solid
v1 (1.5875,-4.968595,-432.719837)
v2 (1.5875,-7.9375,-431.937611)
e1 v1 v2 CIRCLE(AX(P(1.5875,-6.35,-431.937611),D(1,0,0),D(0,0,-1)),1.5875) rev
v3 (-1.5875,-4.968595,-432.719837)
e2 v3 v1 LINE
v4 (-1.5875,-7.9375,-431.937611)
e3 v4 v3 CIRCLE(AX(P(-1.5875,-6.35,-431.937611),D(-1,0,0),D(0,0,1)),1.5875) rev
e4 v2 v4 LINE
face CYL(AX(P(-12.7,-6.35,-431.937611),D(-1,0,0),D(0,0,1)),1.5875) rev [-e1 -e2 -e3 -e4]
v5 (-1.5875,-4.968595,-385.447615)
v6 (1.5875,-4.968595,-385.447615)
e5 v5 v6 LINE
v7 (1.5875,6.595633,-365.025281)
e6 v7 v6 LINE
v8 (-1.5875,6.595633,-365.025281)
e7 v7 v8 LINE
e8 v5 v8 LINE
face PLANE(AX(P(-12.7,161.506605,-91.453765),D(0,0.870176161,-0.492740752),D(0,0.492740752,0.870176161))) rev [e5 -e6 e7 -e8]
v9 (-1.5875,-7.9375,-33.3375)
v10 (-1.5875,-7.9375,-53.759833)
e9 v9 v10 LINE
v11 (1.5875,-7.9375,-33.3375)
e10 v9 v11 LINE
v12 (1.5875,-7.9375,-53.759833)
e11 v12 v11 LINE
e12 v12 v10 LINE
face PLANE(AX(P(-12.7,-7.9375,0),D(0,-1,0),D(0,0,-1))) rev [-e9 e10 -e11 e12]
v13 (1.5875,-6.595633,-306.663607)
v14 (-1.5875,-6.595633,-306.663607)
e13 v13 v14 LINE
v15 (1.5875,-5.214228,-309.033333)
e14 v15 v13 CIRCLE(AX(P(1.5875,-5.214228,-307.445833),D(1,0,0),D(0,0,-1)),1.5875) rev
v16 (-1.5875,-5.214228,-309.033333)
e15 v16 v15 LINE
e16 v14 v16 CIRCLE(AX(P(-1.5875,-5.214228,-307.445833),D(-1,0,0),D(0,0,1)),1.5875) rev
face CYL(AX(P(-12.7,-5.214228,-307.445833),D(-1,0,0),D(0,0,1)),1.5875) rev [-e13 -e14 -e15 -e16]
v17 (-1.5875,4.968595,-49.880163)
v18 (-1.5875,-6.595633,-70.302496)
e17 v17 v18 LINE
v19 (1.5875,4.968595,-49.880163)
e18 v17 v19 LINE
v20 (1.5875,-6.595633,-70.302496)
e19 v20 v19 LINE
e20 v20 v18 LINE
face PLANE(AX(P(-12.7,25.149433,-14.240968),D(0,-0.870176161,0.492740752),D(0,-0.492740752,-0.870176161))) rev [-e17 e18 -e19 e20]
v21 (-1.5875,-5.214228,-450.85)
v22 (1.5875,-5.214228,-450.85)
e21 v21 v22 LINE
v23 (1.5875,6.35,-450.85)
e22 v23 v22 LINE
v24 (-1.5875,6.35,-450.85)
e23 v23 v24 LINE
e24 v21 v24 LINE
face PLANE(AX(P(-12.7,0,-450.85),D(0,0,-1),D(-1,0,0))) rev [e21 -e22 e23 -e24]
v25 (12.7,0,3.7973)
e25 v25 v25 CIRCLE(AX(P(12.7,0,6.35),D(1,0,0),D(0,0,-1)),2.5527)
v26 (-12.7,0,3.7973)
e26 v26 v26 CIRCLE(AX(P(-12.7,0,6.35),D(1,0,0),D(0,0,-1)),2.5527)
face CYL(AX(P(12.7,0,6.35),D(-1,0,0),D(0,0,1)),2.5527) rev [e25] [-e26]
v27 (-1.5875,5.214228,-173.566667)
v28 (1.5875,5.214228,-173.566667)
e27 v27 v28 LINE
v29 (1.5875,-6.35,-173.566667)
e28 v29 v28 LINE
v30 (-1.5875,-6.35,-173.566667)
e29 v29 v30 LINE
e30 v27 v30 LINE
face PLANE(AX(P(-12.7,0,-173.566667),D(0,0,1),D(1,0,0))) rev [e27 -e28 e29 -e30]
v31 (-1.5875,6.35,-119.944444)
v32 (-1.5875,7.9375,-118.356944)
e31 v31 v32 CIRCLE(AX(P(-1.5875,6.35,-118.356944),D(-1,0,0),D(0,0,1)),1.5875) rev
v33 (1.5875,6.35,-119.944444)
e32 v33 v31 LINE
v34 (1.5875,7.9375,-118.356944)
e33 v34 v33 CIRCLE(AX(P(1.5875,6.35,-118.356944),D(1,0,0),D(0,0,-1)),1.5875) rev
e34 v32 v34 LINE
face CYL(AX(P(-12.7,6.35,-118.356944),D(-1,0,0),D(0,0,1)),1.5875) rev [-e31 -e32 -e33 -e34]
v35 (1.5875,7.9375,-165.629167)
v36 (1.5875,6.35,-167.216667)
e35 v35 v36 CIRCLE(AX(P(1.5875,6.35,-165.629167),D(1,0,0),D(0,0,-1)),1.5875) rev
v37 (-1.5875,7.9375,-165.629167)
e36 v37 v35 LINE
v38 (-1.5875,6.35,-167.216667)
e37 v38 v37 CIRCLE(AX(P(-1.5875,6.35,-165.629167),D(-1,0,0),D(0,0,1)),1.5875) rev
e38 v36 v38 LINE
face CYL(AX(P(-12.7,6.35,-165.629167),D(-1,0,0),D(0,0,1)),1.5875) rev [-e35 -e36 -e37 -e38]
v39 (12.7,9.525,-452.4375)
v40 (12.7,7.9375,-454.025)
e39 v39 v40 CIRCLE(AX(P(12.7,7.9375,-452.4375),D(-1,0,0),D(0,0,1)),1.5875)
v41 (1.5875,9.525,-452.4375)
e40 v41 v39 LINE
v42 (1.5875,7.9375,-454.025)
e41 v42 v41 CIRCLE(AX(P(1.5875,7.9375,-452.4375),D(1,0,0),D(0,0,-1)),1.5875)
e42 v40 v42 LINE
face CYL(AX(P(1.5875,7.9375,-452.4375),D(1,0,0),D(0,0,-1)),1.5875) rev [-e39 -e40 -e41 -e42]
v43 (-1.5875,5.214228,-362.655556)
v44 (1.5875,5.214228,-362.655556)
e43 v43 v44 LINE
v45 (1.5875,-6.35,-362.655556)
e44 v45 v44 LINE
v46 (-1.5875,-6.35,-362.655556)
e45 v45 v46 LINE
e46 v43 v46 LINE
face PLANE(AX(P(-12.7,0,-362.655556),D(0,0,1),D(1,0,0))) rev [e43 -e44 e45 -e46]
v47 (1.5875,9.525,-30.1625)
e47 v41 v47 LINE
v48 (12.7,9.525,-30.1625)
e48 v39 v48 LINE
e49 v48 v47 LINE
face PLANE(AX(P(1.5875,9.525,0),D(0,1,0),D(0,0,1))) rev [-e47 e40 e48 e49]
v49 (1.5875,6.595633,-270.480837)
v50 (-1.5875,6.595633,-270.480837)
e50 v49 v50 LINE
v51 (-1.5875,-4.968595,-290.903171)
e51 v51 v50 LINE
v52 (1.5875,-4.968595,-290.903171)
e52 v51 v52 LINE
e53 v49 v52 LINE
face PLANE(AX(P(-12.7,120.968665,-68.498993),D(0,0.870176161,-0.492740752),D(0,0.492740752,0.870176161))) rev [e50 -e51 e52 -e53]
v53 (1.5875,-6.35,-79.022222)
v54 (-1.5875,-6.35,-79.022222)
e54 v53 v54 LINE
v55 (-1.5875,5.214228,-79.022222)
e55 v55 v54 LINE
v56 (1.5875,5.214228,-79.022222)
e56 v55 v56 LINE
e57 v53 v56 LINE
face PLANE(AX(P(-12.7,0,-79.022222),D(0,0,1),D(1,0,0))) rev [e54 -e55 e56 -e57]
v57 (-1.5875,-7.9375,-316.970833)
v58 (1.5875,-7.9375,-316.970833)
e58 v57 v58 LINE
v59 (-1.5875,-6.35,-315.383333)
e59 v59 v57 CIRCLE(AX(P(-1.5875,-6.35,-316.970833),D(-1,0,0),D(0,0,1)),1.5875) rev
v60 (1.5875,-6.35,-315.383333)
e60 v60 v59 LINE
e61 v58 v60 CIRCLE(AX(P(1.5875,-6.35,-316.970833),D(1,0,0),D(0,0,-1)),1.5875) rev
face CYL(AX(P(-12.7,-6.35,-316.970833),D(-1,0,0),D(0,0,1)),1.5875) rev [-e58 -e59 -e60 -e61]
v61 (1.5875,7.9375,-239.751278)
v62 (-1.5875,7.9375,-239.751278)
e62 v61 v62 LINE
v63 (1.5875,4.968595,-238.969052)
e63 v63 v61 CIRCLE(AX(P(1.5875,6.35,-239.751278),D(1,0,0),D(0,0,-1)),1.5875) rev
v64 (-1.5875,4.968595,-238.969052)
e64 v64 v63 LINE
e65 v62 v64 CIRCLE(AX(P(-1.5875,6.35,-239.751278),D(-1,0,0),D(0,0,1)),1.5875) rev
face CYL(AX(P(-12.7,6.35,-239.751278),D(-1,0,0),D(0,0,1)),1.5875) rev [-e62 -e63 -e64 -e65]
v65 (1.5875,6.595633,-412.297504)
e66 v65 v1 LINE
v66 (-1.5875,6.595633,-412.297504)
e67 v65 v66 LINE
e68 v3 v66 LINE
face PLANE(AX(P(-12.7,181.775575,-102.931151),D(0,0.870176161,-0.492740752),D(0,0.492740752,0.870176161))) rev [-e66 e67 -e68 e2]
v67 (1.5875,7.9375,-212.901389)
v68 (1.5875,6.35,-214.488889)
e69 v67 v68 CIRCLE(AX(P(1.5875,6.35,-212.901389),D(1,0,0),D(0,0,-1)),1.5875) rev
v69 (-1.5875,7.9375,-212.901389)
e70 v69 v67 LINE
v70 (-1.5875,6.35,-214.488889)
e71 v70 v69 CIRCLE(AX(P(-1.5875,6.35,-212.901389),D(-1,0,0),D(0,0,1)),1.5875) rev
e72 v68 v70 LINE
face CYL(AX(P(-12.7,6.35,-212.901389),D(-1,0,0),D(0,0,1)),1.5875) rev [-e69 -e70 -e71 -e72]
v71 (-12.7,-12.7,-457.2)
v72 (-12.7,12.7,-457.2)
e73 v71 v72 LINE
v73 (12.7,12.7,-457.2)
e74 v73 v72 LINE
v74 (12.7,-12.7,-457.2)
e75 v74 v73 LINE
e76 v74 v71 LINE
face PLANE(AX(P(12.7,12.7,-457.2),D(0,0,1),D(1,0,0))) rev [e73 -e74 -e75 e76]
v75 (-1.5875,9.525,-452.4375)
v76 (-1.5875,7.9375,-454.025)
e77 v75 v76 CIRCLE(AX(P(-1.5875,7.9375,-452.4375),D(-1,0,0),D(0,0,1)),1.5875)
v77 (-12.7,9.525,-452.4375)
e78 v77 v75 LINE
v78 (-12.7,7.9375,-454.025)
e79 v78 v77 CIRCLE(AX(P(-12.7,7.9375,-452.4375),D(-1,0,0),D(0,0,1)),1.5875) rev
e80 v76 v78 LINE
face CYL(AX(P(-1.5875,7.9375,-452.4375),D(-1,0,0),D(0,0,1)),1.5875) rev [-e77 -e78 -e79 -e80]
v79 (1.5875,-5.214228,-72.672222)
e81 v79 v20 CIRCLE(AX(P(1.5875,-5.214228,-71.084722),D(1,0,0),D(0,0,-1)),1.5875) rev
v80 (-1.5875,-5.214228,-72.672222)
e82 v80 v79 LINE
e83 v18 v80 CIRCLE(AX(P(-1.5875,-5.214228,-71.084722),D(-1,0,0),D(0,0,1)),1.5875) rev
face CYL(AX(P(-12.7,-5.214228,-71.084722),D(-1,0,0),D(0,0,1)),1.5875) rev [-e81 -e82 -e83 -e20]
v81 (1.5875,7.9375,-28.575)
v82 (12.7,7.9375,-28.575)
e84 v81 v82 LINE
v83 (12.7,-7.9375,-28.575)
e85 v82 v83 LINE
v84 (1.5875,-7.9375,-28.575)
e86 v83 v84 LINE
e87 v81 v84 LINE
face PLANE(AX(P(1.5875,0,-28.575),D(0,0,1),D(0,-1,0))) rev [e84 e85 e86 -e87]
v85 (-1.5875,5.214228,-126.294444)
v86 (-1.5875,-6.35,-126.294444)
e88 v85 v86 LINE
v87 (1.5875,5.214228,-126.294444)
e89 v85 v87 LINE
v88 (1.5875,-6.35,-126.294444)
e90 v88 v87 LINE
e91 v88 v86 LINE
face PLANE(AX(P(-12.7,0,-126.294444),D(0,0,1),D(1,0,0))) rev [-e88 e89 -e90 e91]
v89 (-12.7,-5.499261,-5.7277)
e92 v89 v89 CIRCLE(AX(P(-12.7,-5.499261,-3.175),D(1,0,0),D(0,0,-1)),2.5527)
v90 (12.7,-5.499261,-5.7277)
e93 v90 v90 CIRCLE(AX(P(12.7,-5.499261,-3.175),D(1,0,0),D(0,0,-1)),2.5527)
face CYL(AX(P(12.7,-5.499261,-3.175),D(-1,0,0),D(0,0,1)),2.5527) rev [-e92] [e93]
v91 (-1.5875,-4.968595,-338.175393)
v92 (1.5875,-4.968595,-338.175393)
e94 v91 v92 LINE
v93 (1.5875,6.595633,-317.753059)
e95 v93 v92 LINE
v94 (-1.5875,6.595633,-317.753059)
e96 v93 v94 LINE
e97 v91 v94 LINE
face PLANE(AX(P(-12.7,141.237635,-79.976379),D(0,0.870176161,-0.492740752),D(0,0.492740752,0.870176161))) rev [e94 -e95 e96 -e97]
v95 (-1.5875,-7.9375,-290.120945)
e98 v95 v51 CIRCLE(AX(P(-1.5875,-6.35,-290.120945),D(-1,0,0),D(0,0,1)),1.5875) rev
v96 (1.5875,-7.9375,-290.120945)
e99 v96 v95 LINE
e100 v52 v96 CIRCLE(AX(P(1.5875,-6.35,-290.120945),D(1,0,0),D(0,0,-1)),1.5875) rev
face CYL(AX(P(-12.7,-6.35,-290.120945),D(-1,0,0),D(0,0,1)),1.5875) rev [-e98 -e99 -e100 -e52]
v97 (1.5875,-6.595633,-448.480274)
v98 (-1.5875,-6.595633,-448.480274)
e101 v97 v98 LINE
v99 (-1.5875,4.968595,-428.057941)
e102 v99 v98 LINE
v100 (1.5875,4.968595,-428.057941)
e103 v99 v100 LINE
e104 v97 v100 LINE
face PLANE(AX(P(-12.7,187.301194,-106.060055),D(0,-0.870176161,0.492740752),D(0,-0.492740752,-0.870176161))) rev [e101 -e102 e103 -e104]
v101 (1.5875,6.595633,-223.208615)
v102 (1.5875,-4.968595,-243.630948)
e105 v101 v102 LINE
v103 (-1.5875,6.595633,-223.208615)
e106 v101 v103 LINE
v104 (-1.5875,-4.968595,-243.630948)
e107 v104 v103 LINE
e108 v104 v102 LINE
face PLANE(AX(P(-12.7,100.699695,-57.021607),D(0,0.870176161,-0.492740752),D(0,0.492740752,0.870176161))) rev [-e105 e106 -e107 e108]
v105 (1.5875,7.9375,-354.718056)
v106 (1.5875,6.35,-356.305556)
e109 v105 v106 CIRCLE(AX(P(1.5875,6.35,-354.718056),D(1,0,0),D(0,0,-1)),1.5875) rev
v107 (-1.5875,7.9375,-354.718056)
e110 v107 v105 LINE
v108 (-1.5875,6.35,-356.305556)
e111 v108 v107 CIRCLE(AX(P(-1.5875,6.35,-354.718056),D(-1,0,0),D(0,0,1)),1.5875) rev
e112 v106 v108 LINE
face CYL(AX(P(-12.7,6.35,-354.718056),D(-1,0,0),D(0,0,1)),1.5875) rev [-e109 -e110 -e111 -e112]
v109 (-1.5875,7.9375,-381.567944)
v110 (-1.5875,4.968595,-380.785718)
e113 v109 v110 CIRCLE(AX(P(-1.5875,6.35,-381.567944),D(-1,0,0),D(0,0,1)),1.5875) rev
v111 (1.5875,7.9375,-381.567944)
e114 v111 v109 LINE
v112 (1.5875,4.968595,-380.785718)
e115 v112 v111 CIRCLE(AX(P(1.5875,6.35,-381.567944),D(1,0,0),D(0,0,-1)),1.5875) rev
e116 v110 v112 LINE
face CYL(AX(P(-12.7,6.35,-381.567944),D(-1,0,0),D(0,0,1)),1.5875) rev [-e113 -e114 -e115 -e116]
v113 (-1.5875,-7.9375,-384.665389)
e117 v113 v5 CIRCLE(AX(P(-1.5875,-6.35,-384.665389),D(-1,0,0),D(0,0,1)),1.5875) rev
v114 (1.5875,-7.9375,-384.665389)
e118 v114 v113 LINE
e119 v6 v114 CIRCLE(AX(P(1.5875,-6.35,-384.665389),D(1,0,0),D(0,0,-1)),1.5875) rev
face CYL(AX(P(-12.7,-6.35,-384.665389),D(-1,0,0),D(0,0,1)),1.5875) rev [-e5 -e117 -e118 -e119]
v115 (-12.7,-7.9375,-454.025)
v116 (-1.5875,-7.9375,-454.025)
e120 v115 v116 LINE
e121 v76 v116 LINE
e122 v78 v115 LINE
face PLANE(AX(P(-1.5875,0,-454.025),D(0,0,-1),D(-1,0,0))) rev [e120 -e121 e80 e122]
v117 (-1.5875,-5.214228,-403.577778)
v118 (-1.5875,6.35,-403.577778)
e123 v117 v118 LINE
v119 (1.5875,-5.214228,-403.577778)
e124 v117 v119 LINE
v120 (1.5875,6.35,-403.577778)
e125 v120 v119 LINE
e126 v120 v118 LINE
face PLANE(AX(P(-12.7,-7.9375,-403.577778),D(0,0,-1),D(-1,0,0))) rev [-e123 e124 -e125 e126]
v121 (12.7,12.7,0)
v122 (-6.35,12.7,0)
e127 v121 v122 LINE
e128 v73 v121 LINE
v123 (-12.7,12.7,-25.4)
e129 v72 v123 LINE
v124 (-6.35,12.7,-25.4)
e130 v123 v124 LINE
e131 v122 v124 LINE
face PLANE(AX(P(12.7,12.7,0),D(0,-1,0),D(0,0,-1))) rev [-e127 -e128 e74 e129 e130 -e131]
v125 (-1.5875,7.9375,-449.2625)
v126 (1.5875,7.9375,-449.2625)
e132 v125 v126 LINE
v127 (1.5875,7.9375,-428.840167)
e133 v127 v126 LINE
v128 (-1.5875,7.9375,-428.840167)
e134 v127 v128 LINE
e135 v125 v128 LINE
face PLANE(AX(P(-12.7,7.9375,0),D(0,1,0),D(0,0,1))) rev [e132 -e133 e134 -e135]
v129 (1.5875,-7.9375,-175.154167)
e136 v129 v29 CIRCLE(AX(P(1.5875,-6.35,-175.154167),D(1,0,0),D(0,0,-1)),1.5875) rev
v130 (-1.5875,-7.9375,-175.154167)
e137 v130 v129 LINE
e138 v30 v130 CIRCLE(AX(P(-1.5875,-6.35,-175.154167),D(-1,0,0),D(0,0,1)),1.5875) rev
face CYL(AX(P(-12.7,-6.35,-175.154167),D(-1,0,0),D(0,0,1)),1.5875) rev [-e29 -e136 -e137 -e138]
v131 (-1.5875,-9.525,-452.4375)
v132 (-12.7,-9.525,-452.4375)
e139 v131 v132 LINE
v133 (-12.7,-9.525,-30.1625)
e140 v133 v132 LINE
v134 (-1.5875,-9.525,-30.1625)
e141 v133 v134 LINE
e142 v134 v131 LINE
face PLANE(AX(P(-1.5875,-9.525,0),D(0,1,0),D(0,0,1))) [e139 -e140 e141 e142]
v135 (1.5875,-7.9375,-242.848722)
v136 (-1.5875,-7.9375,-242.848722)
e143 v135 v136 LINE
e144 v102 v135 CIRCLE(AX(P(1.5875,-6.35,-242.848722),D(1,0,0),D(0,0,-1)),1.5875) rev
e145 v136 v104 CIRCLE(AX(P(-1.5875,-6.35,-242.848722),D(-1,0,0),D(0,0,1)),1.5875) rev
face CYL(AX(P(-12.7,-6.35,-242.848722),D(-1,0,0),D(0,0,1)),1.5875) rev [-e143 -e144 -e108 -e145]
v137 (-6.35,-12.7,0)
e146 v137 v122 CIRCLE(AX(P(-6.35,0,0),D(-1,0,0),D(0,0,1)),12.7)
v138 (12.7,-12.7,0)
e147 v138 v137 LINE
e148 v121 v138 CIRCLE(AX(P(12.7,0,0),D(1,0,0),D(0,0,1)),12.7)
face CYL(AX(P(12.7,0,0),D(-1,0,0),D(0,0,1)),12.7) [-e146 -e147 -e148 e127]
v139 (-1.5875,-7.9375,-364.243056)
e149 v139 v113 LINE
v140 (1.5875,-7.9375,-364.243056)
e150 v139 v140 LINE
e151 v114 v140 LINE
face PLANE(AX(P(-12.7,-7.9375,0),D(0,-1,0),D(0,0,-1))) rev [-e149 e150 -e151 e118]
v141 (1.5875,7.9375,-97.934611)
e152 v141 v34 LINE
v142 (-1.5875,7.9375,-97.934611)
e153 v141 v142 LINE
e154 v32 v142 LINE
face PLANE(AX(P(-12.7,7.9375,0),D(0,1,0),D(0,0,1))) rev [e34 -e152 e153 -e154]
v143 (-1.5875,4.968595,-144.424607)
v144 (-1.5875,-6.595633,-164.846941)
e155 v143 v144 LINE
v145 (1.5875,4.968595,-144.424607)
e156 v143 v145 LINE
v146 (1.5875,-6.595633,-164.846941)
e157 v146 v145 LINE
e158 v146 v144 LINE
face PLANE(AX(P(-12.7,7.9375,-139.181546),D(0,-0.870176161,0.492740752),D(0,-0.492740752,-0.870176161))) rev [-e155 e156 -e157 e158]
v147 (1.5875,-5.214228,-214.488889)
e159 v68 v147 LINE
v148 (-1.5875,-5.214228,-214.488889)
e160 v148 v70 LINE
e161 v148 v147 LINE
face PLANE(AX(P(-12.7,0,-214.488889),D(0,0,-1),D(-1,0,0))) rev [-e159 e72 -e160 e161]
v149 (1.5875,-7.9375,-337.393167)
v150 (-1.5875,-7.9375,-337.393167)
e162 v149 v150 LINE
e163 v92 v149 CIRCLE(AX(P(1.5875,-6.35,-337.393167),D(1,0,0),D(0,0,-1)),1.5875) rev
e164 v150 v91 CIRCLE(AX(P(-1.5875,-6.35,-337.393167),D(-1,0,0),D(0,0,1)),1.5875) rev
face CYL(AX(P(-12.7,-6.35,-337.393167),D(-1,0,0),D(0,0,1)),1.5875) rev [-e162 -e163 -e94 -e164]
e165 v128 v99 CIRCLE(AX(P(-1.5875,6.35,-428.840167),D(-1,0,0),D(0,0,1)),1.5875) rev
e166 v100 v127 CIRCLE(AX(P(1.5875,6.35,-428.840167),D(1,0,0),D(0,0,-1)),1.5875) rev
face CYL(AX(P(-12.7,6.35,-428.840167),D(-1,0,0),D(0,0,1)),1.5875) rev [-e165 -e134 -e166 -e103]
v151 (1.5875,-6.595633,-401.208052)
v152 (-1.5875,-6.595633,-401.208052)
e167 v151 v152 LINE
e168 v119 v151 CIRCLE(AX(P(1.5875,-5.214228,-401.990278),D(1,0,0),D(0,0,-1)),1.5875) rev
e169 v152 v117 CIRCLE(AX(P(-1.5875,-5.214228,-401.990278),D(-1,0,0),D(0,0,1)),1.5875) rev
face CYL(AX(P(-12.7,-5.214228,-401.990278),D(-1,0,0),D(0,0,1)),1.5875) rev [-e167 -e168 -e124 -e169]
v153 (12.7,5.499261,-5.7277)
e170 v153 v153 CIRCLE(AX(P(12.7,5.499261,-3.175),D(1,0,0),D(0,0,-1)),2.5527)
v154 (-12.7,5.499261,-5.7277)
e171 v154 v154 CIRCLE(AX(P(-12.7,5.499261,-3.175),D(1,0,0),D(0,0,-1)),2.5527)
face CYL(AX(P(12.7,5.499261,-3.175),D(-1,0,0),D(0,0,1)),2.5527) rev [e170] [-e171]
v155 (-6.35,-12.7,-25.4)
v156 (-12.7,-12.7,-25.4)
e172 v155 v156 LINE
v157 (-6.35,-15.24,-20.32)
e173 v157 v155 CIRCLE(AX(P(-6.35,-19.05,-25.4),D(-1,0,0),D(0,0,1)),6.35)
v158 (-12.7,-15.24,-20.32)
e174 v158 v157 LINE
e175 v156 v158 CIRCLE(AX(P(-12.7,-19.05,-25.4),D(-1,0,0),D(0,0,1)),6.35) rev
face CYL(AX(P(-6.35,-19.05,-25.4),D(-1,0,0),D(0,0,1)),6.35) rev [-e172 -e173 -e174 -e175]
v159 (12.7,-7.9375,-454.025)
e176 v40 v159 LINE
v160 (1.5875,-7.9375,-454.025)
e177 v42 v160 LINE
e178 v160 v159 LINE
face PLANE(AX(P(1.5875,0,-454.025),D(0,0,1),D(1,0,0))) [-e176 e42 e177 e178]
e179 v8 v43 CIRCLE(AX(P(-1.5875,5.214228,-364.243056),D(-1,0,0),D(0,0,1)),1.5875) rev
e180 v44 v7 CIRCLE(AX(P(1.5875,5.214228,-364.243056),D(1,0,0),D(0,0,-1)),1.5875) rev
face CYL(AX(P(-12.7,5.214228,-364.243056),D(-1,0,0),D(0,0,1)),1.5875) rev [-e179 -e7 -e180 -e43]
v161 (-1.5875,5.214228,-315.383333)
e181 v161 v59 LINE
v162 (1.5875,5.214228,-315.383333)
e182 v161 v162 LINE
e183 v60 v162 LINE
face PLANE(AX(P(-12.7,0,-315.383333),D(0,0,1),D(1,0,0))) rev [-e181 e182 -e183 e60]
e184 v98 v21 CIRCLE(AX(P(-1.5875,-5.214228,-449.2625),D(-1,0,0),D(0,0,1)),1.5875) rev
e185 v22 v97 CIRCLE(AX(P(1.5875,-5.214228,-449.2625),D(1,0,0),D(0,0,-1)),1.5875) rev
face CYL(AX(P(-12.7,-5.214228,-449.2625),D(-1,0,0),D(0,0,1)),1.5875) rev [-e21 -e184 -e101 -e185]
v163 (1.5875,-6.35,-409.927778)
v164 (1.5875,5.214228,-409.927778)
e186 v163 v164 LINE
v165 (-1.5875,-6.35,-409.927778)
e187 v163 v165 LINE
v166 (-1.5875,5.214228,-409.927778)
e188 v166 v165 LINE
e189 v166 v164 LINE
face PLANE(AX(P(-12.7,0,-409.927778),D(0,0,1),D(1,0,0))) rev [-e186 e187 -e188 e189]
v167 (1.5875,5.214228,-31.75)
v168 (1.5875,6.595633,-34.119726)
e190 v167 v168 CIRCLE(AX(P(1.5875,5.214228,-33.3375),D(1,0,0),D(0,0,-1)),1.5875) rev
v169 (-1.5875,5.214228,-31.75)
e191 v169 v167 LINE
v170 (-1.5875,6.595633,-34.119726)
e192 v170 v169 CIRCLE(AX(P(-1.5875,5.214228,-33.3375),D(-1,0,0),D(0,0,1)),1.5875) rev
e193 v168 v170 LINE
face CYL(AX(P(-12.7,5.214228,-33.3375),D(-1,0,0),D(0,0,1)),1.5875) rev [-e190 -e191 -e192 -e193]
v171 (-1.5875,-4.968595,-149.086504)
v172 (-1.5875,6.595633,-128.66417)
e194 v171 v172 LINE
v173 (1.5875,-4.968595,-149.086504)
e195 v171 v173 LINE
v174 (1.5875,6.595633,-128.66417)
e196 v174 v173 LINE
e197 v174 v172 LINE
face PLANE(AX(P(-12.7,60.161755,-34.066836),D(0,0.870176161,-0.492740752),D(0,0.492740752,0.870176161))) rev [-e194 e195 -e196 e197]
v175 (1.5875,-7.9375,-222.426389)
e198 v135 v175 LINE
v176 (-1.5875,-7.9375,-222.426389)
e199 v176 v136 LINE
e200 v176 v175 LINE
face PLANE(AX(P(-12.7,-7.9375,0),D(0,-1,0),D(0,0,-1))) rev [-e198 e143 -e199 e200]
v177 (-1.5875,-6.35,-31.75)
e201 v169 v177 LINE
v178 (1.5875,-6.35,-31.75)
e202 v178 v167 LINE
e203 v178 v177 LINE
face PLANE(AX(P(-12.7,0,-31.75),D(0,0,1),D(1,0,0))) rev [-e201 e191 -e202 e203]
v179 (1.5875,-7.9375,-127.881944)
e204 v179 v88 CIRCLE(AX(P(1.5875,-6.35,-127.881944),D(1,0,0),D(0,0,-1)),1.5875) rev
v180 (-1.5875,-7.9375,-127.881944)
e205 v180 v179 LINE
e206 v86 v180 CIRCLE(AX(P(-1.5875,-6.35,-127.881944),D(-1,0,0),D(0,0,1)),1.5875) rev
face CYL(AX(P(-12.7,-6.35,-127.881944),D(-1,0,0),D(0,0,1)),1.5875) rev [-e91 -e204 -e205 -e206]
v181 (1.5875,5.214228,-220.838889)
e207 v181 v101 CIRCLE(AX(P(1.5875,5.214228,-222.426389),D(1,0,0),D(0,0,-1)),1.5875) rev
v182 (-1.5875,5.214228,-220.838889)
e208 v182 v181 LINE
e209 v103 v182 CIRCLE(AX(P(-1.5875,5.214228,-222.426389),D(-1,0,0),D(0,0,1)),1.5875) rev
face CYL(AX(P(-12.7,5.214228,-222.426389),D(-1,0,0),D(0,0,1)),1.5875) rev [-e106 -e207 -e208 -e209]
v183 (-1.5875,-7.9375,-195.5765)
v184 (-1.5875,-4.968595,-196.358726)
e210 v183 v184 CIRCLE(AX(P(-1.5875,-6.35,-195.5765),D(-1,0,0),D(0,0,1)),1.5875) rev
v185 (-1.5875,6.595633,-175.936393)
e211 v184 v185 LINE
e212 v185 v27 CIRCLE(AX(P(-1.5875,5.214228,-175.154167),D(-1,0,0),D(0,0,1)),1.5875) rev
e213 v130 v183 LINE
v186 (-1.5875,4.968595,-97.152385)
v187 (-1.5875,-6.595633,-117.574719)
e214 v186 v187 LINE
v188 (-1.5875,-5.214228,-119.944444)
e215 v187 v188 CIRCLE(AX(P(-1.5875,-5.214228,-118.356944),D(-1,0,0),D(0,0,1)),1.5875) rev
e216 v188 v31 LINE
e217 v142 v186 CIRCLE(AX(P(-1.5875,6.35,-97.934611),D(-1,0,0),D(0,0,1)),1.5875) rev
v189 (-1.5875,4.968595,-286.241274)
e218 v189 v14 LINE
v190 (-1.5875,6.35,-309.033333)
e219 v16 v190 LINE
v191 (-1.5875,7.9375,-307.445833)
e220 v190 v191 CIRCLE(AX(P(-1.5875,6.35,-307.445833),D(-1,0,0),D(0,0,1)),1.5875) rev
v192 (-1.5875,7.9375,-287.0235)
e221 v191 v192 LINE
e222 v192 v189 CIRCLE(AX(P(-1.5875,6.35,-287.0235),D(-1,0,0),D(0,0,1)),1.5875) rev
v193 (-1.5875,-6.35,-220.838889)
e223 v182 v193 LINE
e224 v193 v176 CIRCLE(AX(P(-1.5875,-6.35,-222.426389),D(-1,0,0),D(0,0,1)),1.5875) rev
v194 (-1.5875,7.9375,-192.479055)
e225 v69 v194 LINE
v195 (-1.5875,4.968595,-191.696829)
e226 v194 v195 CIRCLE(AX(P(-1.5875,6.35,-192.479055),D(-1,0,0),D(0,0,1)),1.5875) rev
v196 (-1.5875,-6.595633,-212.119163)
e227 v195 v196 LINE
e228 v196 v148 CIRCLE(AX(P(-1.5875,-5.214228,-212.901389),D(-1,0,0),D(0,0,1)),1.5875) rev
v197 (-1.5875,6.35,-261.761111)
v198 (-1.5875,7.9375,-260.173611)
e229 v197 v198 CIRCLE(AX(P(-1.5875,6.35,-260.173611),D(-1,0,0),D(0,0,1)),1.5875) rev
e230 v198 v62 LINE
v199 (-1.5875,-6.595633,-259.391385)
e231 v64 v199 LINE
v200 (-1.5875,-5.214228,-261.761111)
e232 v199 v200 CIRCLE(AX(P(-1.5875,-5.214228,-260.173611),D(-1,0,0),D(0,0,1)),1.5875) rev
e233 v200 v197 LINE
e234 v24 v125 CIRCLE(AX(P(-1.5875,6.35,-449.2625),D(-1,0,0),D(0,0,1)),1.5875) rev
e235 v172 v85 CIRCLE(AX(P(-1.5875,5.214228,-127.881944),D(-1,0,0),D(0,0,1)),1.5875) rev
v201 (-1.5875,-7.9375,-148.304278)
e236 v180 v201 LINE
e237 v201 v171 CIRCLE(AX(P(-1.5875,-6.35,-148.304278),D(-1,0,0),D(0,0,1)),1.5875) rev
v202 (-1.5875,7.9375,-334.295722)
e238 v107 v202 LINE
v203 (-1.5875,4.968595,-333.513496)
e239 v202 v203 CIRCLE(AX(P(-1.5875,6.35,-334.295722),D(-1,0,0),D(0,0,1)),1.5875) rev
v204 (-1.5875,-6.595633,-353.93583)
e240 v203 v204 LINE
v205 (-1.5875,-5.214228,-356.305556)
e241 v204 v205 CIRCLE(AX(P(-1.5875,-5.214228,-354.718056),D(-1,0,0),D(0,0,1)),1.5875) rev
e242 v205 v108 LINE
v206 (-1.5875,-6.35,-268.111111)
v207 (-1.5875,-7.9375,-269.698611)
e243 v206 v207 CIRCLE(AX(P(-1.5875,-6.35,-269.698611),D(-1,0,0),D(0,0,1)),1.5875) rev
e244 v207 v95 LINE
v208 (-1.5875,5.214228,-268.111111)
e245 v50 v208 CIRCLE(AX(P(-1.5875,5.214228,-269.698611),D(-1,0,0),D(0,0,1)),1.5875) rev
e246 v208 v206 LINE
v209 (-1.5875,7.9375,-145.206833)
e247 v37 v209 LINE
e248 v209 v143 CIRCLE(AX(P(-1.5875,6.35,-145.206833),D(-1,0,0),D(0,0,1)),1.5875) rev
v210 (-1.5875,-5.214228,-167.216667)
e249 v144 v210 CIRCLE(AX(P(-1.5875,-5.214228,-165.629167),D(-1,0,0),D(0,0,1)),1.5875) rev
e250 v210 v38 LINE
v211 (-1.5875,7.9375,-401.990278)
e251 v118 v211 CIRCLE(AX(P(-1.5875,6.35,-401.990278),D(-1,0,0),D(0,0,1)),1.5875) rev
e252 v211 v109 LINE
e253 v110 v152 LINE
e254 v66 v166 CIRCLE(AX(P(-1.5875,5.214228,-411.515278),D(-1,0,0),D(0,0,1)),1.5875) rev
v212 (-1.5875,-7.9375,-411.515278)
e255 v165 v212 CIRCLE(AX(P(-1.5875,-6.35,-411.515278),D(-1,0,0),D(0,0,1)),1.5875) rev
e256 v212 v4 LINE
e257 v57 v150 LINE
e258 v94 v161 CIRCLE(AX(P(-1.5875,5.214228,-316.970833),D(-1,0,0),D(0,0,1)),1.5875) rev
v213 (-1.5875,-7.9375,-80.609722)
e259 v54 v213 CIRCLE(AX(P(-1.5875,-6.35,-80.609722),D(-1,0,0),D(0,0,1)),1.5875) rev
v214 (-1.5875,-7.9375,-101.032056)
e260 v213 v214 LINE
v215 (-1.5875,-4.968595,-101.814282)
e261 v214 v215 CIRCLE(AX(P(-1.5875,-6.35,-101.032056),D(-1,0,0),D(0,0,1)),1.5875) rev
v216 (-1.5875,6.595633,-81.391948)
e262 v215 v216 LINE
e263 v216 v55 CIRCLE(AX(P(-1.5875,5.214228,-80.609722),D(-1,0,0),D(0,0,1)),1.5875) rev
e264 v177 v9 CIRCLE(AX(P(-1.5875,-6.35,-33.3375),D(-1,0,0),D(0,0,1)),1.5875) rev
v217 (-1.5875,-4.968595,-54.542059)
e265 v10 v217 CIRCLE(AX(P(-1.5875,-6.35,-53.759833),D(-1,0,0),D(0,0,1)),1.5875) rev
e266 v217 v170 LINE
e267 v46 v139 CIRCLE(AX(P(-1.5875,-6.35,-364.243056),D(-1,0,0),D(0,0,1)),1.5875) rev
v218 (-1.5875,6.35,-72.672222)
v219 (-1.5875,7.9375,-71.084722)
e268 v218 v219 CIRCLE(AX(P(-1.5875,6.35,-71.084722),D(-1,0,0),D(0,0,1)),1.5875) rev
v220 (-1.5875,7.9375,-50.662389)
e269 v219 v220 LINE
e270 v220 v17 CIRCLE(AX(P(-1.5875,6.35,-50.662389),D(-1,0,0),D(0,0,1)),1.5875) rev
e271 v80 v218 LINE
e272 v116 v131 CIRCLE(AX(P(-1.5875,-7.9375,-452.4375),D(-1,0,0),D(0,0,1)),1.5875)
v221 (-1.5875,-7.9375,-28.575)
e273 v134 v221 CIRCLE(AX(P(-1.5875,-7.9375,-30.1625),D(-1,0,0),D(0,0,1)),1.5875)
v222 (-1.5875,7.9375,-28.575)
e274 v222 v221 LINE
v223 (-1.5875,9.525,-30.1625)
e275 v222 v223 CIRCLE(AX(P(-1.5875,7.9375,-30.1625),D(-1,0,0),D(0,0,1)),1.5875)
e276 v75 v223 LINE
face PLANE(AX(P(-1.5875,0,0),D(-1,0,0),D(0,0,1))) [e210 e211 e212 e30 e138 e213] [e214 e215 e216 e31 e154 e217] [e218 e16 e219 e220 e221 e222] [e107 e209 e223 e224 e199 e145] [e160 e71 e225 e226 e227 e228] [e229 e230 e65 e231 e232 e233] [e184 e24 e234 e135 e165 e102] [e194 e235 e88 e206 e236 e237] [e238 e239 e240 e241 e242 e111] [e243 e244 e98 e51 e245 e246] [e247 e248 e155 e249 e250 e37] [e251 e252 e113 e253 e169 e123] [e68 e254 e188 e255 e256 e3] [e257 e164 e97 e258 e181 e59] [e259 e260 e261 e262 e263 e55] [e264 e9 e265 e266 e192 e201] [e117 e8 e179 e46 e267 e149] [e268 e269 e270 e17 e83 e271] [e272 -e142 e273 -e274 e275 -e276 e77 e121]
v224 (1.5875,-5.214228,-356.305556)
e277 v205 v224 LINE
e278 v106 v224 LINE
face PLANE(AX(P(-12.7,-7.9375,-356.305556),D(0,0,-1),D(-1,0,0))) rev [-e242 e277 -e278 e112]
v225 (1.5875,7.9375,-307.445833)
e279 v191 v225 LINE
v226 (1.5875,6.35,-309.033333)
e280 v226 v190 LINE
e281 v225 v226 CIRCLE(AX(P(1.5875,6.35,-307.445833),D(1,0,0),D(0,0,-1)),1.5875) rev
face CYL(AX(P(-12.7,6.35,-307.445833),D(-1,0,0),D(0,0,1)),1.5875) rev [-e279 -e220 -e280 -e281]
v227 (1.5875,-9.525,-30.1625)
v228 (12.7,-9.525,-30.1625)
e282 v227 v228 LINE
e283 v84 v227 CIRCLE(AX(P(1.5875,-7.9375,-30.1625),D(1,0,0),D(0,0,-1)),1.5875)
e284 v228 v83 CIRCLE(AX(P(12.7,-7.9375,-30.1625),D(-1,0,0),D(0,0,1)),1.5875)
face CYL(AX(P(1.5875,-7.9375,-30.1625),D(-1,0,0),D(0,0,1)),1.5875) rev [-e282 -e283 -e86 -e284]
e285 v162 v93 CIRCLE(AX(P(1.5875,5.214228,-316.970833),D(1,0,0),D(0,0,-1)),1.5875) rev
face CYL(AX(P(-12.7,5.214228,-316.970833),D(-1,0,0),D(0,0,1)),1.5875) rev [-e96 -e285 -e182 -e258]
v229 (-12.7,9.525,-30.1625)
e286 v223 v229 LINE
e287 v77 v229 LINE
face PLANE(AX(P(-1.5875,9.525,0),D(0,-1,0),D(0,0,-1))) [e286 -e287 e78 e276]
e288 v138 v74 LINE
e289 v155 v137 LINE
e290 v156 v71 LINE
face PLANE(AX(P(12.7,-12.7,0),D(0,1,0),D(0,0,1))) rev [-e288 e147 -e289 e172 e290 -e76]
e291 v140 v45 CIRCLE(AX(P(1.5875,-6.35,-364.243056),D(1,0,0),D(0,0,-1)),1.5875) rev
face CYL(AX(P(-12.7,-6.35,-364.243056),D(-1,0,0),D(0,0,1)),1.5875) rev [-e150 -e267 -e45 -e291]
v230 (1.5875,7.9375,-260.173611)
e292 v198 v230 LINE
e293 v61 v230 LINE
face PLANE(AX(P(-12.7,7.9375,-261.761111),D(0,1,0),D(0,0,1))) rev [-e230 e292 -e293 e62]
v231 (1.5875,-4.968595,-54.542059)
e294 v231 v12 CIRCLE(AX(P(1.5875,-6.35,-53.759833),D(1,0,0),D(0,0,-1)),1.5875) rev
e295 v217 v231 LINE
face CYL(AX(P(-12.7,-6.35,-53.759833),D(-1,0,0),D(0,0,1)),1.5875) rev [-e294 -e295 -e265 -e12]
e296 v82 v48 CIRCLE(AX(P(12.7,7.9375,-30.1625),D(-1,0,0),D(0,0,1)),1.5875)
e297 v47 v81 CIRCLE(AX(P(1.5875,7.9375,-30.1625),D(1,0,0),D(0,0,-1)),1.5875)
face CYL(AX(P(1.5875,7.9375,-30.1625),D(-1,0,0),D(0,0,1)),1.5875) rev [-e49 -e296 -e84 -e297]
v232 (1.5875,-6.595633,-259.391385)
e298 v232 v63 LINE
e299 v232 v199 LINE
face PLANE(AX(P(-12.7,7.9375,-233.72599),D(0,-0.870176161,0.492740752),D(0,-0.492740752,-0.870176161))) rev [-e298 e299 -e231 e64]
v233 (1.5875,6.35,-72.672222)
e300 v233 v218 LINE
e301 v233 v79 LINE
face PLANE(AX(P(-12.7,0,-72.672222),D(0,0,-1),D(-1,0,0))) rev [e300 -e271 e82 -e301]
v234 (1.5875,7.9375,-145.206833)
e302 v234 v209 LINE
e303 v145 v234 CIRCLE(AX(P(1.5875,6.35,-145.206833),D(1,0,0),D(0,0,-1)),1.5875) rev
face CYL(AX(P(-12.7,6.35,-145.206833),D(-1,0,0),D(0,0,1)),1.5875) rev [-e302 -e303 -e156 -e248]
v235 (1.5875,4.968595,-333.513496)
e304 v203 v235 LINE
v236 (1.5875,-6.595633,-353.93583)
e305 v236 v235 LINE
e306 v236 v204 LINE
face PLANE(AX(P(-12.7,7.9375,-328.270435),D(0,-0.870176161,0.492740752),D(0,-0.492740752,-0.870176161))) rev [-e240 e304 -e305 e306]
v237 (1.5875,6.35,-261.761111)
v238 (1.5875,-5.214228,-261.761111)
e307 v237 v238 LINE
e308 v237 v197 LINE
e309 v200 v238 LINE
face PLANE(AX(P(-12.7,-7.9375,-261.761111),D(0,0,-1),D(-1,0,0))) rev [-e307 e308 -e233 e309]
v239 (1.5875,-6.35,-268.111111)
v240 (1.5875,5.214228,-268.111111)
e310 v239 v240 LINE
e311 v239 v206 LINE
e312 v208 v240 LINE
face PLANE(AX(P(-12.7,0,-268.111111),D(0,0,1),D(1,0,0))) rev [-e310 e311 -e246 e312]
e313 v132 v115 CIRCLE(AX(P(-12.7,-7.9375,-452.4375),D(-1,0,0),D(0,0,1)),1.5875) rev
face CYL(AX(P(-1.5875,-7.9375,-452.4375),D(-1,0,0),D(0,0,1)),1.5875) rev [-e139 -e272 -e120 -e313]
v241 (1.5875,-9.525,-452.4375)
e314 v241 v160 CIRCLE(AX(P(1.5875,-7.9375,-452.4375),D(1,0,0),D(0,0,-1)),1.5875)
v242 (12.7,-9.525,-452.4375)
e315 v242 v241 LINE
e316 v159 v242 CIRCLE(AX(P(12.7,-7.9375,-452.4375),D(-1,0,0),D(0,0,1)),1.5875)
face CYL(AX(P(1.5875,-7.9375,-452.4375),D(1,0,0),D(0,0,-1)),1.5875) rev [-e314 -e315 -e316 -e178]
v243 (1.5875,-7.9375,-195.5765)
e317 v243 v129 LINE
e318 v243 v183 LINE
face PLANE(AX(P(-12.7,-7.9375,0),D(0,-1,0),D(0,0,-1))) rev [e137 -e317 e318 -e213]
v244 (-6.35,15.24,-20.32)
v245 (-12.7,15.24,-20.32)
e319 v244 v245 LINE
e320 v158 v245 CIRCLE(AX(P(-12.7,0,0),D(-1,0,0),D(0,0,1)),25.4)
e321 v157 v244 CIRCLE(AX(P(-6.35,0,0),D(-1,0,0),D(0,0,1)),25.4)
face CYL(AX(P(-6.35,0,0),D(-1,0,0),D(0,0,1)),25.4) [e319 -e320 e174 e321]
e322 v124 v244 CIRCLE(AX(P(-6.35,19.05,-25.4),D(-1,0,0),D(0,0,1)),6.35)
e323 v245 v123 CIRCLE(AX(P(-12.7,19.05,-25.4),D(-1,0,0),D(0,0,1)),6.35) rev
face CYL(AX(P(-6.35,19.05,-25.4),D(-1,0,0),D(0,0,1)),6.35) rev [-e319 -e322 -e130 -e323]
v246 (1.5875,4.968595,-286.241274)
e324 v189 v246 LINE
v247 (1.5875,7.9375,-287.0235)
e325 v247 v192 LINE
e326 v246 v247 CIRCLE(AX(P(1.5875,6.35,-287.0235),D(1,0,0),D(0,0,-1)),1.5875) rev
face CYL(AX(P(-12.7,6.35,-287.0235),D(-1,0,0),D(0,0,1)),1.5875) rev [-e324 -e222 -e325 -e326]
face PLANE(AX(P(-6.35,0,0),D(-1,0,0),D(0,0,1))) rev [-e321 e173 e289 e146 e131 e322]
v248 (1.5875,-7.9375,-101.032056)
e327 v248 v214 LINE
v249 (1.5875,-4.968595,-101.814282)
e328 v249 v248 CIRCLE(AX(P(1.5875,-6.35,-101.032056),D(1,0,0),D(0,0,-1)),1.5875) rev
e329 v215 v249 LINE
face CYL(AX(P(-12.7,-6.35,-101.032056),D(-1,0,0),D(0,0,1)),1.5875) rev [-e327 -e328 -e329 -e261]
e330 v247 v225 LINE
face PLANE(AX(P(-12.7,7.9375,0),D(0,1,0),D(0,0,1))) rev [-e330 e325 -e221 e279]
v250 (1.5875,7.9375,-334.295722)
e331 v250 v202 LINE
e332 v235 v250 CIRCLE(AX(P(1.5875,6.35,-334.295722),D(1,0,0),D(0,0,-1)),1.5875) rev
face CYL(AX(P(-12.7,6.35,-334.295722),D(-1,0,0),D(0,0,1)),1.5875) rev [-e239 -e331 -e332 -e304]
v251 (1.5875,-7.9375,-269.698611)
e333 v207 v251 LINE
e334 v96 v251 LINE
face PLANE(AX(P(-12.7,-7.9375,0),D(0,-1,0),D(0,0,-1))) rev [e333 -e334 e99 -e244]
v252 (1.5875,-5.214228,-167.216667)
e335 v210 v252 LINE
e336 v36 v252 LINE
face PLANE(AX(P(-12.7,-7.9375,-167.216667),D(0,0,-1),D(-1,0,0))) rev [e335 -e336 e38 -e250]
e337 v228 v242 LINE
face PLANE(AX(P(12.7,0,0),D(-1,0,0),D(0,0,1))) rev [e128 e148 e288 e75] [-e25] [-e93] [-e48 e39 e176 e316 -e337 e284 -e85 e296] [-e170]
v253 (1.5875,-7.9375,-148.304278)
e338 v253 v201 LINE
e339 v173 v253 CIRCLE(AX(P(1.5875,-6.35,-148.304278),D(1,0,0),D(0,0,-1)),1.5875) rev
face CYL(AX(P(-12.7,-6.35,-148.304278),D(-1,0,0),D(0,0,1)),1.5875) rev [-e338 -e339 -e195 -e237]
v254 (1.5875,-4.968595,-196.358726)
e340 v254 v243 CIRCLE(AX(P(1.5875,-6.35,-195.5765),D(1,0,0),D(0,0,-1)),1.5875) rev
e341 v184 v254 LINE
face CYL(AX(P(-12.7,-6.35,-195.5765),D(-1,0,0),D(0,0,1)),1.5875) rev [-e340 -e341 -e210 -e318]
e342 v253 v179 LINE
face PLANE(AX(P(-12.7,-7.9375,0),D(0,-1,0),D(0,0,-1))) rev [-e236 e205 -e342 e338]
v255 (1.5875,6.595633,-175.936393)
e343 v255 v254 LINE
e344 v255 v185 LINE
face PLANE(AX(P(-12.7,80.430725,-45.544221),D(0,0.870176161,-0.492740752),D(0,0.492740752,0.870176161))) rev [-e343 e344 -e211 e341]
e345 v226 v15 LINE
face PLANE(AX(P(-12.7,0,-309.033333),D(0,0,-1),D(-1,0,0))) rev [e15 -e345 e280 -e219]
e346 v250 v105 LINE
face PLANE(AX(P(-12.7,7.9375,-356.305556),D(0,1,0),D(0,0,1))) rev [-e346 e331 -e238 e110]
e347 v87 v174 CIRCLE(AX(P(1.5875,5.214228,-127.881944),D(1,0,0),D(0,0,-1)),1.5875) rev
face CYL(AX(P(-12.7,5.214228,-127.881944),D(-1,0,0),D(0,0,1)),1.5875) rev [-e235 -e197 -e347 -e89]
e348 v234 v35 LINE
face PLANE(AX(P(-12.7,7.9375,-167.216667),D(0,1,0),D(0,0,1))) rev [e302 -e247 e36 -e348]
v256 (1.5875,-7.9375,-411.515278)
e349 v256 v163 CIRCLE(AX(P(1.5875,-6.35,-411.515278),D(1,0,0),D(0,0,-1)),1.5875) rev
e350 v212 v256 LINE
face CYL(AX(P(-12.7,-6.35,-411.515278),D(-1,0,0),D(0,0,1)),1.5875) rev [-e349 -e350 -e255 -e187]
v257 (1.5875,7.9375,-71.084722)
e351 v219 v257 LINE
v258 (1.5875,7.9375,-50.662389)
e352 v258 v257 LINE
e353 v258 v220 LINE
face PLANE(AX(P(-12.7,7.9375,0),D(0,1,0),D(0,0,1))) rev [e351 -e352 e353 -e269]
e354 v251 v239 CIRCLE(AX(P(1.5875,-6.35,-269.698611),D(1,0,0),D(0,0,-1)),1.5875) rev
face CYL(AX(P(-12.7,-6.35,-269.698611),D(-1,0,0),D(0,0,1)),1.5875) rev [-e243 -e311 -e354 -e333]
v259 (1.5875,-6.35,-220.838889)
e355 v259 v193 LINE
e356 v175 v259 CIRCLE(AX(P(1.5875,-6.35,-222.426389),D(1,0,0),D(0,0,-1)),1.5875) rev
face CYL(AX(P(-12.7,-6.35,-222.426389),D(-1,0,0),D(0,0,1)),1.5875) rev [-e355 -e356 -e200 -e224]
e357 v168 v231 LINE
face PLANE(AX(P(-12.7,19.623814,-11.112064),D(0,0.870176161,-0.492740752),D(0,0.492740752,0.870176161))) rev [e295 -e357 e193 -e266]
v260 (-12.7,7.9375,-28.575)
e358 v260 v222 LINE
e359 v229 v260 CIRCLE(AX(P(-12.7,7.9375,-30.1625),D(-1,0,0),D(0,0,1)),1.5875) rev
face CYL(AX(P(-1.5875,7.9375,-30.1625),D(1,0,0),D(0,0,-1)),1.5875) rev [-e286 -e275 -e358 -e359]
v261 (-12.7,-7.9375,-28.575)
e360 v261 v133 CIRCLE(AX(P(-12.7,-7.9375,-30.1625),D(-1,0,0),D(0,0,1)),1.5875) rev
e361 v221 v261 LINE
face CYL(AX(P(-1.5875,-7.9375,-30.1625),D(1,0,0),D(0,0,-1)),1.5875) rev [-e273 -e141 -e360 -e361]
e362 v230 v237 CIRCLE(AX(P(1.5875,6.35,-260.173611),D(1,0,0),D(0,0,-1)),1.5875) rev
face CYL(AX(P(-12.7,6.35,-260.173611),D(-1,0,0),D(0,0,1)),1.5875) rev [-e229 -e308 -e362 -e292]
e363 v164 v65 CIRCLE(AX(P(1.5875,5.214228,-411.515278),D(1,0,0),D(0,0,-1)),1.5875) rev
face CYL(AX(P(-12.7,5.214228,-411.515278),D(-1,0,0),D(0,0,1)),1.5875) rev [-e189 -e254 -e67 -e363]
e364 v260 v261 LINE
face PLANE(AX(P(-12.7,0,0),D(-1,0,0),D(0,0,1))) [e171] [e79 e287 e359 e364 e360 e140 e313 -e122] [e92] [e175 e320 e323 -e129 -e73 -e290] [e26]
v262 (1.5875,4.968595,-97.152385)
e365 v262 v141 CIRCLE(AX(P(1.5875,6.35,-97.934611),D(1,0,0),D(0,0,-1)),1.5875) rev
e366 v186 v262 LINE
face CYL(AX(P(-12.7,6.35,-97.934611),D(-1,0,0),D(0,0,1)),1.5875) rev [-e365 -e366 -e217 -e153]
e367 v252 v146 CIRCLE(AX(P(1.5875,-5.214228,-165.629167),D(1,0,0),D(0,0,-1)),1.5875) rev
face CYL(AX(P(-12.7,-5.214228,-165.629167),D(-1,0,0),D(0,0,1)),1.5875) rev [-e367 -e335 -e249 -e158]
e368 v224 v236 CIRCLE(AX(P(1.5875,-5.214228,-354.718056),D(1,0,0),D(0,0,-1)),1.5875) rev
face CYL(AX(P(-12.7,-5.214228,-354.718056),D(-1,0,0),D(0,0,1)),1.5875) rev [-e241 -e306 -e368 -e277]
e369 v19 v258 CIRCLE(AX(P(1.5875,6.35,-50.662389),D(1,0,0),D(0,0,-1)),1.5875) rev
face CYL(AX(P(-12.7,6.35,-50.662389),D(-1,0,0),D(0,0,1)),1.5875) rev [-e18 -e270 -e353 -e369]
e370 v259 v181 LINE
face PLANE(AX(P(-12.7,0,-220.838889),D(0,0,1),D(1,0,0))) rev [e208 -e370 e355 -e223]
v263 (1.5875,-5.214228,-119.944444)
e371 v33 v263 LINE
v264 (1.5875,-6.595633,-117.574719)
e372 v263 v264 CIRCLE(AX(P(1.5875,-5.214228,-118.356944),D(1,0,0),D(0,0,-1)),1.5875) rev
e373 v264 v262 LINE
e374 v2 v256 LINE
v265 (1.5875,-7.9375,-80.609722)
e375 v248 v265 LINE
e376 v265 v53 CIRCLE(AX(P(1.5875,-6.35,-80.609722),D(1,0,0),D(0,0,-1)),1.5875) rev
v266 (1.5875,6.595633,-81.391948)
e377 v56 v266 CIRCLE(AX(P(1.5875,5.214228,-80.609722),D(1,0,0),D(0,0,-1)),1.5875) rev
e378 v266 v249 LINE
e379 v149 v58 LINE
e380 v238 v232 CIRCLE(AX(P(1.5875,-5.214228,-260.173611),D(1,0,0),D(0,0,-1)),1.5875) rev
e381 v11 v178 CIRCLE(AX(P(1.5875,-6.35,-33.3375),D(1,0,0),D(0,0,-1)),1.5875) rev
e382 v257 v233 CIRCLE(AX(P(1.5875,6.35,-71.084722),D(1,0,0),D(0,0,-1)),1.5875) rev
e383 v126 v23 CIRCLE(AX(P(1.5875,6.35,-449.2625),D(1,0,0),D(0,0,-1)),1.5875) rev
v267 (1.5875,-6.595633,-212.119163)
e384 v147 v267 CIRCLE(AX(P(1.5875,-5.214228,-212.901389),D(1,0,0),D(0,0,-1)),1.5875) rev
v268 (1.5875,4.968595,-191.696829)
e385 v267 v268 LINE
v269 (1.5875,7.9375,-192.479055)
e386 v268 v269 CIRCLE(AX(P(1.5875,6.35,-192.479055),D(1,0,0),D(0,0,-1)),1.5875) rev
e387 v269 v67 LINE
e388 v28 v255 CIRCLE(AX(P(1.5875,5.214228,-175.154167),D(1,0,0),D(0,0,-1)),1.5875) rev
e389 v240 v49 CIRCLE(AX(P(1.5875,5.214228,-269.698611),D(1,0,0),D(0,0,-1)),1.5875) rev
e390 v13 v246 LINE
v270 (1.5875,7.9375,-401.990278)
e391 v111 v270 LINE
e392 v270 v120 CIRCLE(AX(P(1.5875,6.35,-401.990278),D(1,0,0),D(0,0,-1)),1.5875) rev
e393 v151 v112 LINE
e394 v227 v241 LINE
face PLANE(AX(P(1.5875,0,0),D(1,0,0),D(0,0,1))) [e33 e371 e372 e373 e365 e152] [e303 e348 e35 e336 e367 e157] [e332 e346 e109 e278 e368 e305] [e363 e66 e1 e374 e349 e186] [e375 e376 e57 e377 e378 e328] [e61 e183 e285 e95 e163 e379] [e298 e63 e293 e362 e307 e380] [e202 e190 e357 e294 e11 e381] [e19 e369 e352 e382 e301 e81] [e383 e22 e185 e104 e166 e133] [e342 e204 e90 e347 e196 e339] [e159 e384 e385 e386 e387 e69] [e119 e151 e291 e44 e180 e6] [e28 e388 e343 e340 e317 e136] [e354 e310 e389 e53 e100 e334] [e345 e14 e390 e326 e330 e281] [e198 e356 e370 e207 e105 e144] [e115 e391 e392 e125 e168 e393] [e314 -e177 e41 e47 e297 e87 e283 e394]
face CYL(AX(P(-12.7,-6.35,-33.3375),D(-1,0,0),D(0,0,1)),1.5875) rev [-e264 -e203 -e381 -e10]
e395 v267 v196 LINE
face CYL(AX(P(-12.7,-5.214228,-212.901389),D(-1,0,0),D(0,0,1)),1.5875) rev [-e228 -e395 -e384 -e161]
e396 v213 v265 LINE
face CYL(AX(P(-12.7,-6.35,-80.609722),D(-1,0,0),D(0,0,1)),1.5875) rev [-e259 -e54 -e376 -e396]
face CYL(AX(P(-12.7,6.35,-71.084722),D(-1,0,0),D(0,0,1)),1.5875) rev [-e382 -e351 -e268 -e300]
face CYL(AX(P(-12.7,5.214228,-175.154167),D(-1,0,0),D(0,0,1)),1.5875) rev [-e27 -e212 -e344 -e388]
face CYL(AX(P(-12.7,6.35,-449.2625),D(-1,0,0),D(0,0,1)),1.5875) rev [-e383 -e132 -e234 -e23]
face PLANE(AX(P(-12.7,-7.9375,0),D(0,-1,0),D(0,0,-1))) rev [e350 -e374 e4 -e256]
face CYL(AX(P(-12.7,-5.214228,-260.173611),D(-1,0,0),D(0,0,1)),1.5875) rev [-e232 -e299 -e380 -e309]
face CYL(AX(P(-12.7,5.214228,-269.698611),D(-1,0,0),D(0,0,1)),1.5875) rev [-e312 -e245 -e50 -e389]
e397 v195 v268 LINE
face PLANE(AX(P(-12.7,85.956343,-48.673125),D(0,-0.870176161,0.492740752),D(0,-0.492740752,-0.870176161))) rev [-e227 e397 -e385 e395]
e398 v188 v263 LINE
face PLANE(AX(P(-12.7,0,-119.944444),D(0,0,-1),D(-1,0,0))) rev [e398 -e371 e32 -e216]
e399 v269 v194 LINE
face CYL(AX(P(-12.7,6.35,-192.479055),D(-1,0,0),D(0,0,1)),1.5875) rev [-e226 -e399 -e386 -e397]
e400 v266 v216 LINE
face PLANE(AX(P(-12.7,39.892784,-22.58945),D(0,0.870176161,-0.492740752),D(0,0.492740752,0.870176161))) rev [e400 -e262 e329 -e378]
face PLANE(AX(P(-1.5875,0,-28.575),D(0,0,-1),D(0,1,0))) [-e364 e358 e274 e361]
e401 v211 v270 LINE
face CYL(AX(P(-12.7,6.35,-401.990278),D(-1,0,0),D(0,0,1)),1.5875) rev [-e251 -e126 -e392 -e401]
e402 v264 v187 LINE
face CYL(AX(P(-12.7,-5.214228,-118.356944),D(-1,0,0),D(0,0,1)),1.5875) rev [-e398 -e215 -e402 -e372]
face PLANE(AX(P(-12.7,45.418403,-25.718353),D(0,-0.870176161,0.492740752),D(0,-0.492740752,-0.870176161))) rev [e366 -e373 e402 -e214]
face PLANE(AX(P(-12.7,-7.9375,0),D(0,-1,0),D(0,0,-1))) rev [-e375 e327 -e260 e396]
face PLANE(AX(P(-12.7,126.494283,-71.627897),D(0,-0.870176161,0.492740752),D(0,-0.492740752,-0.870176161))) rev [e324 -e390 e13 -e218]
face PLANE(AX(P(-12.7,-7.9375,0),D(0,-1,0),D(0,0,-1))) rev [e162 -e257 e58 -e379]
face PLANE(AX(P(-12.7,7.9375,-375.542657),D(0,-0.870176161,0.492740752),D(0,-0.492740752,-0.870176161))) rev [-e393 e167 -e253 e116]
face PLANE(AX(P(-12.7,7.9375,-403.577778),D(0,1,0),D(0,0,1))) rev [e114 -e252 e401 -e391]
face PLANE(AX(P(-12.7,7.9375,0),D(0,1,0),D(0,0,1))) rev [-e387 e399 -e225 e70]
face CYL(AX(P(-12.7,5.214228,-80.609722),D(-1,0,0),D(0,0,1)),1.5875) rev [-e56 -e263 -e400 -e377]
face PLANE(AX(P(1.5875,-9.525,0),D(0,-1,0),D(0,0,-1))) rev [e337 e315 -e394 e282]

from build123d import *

# Parameters (mm, degrees)
SKETCH1_R           = 2.5527
BOSS_EXTRUDE1_DEPTH = 12.7
SKETCH3_R           = 25.4
BOSS_EXTRUDE2_DEPTH = 6.35
SKETCH4_R           = 2.5527
CUT_EXTRUDE1_DEPTH  = 459.301104624
FILLET1_R           = 6.35
CUT_EXTRUDE2_START  = -12.7
CUT_EXTRUDE2_DEPTH  = 25.4
SKETCH7_W           = 425.45
SKETCH7_H           = 19.05
CUT_EXTRUDE4_DEPTH  = 11.1125
FILLET3_R           = 1.5875
FILLET4_R           = 1.5875


# Read off the part's stored shape, not the designer's step: Cut-Extrude2
with BuildPart() as part:
    # Sketch1 → Boss-Extrude1 (new, symmetric)
    with BuildSketch(Plane(origin=(0, 0, 0), x_dir=(0, 0, -1), z_dir=(1, 0, 0))):
        with BuildLine():
            Line((0, 12.7), (457.2, 12.7))
            Line((457.2, 12.7), (457.2, -12.7))
            Line((457.2, -12.7), (0, -12.7))
            ThreePointArc((0, -12.7), (-12.7, 0), (0, 12.7))
        make_face()
        with Locations((3.175, 5.499261314)):
            Circle(SKETCH1_R, mode=Mode.SUBTRACT)
        with Locations((-6.35, 0)):
            Circle(SKETCH1_R, mode=Mode.SUBTRACT)
        with Locations((3.175, -5.499261314)):
            Circle(SKETCH1_R, mode=Mode.SUBTRACT)
    extrude(amount=BOSS_EXTRUDE1_DEPTH, both=True)

    # Sketch3 → Boss-Extrude2 (add)
    with BuildSketch(Plane.ZY.offset(12.7)):
        Circle(SKETCH3_R)
    extrude(amount=-BOSS_EXTRUDE2_DEPTH)

    # Sketch4 → Cut-Extrude1 (cut, through all)
    with BuildSketch(Plane(origin=(-6.35, 0, 0), x_dir=(0, 0, -1), z_dir=(1, 0, 0))):
        with Locations((3.175, 5.499261314)):
            Circle(SKETCH4_R)
        with Locations((3.175, -5.499261314)):
            Circle(SKETCH4_R)
        with Locations((-6.35, 0)):
            Circle(SKETCH4_R)
    extrude(amount=-CUT_EXTRUDE1_DEPTH, mode=Mode.SUBTRACT)

    # Fillet1
    fillet1_edges = [part.edges().sort_by_distance(p)[0] for p in [
        (-9.525, 12.7, -21.997045256),
        (-9.525, -12.7, -21.997045256),
    ]]
    fillet(fillet1_edges, radius=FILLET1_R)

    # Cut-Extrude2 outline → Cut-Extrude2 (cut)
    with BuildSketch(Plane.YZ.offset(CUT_EXTRUDE2_START)):
        Polygon((7.9375, -31.75), (-7.9375, -31.75), (-7.9375, -59.785120896), align=None)
        Polygon((7.9375, -79.022222222), (-7.9375, -79.022222222), (-7.9375, -107.057343118), align=None)
        Polygon((7.9375, -126.294444444), (-7.9375, -126.294444444), (-7.9375, -154.329565341), align=None)
        Polygon((7.9375, -173.566666667), (-7.9375, -173.566666667), (-7.9375, -201.601787563), align=None)
        Polygon((7.9375, -220.838888889), (-7.9375, -220.838888889), (-7.9375, -248.874009785), align=None)
        Polygon((7.9375, -268.111111111), (-7.9375, -268.111111111), (-7.9375, -296.146232007), align=None)
        Polygon((7.9375, -315.383333333), (-7.9375, -315.383333333), (-7.9375, -343.41845423), align=None)
        Polygon((7.9375, -362.655555556), (-7.9375, -362.655555556), (-7.9375, -390.690676452), align=None)
        Polygon((7.9375, -409.927777778), (-7.9375, -409.927777778), (-7.9375, -437.962898674), align=None)
        Polygon((7.9375, -44.637101326), (-7.9375, -72.672222222), (7.9375, -72.672222222), align=None)
        Polygon((-7.9375, -119.944444444), (7.9375, -119.944444444), (7.9375, -91.909323548), align=None)
        Polygon((-7.9375, -214.488888889), (7.9375, -214.488888889), (7.9375, -186.453767993), align=None)
        Polygon((-7.9375, -309.033333333), (7.9375, -309.033333333), (7.9375, -280.998212437), align=None)
        Polygon((-7.9375, -450.85), (7.9375, -450.85), (7.9375, -422.814879104), align=None)
        Polygon((-7.9375, -167.216666667), (7.9375, -167.216666667), (7.9375, -139.18154577), align=None)
        Polygon((-7.9375, -261.761111111), (7.9375, -261.761111111), (7.9375, -233.725990215), align=None)
        Polygon((-7.9375, -356.305555556), (7.9375, -356.305555556), (7.9375, -328.270434659), align=None)
        Polygon((-7.9375, -403.577777778), (7.9375, -403.577777778), (7.9375, -375.542656882), align=None)
    extrude(amount=CUT_EXTRUDE2_DEPTH, mode=Mode.SUBTRACT)

    # Sketch7 → Cut-Extrude4 (cut)
    with BuildSketch(Plane.ZY.offset(12.7)):
        with Locations((-241.3, 0)):
            Rectangle(SKETCH7_W, SKETCH7_H)
    cut_extrude4 = extrude(amount=-CUT_EXTRUDE4_DEPTH, mode=Mode.SUBTRACT)

    # Fillet3
    fillet3_edges = [part.edges().sort_by_distance(p)[0] for p in [
        (5.55625, 7.9375, -375.542656882),
        (5.55625, 7.9375, -403.577777778),
        (5.55625, -7.9375, -403.577777778),
        (5.55625, 7.9375, -328.270434659),
        (5.55625, 7.9375, -356.305555556),
        (5.55625, -7.9375, -356.305555556),
        (5.55625, 7.9375, -233.725990215),
        (5.55625, 7.9375, -261.761111111),
        (5.55625, -7.9375, -261.761111111),
        (5.55625, 7.9375, -139.18154577),
        (5.55625, 7.9375, -167.216666667),
        (5.55625, -7.9375, -167.216666667),
        (5.55625, 7.9375, -422.814879104),
        (5.55625, 7.9375, -450.85),
        (5.55625, -7.9375, -450.85),
        (5.55625, 7.9375, -409.927777778),
        (5.55625, -7.9375, -437.962898674),
        (5.55625, -7.9375, -409.927777778),
        (5.55625, 7.9375, -362.655555556),
        (5.55625, -7.9375, -390.690676452),
        (5.55625, -7.9375, -362.655555556),
        (5.55625, 7.9375, -315.383333333),
        (5.55625, -7.9375, -343.41845423),
        (5.55625, -7.9375, -315.383333333),
        (5.55625, 7.9375, -280.998212437),
        (5.55625, 7.9375, -309.033333333),
        (5.55625, -7.9375, -309.033333333),
        (5.55625, 7.9375, -268.111111111),
        (5.55625, -7.9375, -296.146232007),
        (5.55625, -7.9375, -268.111111111),
        (5.55625, 7.9375, -220.838888889),
        (5.55625, -7.9375, -248.874009785),
        (5.55625, -7.9375, -220.838888889),
        (5.55625, 7.9375, -186.453767993),
        (5.55625, 7.9375, -214.488888889),
        (5.55625, -7.9375, -214.488888889),
        (5.55625, 7.9375, -173.566666667),
        (5.55625, -7.9375, -201.601787563),
        (5.55625, -7.9375, -173.566666667),
        (5.55625, 7.9375, -126.294444444),
        (5.55625, -7.9375, -154.329565341),
        (5.55625, -7.9375, -126.294444444),
        (5.55625, 7.9375, -91.909323548),
        (5.55625, 7.9375, -119.944444444),
        (5.55625, -7.9375, -119.944444444),
        (5.55625, 7.9375, -79.022222222),
        (5.55625, -7.9375, -107.057343118),
        (5.55625, -7.9375, -79.022222222),
        (5.55625, 7.9375, -44.637101326),
        (5.55625, 7.9375, -72.672222222),
        (5.55625, -7.9375, -72.672222222),
        (5.55625, 7.9375, -31.75),
        (5.55625, -7.9375, -59.785120896),
        (5.55625, -7.9375, -31.75),
    ]]
    fillet(fillet3_edges, radius=FILLET3_R)

    # Mirror1: Cut-Extrude4 across plane
    add(cut_extrude4.mirror(Plane(origin=(0, 0, 0), x_dir=(0, 0, 1), z_dir=(1, 0, 0))), mode=Mode.SUBTRACT)

    # Fillet4
    fillet4_edges = [part.edges().sort_by_distance(p)[0] for p in [
        (-7.14375, -9.525, -28.575),
        (-7.14375, -9.525, -454.025),
        (-7.14375, 9.525, -454.025),
        (-7.14375, 9.525, -28.575),
        (7.14375, -9.525, -454.025),
        (7.14375, -9.525, -28.575),
        (7.14375, 9.525, -28.575),
        (7.14375, 9.525, -454.025),
    ]]
    fillet(fillet4_edges, radius=FILLET4_R)


solid = part.part
